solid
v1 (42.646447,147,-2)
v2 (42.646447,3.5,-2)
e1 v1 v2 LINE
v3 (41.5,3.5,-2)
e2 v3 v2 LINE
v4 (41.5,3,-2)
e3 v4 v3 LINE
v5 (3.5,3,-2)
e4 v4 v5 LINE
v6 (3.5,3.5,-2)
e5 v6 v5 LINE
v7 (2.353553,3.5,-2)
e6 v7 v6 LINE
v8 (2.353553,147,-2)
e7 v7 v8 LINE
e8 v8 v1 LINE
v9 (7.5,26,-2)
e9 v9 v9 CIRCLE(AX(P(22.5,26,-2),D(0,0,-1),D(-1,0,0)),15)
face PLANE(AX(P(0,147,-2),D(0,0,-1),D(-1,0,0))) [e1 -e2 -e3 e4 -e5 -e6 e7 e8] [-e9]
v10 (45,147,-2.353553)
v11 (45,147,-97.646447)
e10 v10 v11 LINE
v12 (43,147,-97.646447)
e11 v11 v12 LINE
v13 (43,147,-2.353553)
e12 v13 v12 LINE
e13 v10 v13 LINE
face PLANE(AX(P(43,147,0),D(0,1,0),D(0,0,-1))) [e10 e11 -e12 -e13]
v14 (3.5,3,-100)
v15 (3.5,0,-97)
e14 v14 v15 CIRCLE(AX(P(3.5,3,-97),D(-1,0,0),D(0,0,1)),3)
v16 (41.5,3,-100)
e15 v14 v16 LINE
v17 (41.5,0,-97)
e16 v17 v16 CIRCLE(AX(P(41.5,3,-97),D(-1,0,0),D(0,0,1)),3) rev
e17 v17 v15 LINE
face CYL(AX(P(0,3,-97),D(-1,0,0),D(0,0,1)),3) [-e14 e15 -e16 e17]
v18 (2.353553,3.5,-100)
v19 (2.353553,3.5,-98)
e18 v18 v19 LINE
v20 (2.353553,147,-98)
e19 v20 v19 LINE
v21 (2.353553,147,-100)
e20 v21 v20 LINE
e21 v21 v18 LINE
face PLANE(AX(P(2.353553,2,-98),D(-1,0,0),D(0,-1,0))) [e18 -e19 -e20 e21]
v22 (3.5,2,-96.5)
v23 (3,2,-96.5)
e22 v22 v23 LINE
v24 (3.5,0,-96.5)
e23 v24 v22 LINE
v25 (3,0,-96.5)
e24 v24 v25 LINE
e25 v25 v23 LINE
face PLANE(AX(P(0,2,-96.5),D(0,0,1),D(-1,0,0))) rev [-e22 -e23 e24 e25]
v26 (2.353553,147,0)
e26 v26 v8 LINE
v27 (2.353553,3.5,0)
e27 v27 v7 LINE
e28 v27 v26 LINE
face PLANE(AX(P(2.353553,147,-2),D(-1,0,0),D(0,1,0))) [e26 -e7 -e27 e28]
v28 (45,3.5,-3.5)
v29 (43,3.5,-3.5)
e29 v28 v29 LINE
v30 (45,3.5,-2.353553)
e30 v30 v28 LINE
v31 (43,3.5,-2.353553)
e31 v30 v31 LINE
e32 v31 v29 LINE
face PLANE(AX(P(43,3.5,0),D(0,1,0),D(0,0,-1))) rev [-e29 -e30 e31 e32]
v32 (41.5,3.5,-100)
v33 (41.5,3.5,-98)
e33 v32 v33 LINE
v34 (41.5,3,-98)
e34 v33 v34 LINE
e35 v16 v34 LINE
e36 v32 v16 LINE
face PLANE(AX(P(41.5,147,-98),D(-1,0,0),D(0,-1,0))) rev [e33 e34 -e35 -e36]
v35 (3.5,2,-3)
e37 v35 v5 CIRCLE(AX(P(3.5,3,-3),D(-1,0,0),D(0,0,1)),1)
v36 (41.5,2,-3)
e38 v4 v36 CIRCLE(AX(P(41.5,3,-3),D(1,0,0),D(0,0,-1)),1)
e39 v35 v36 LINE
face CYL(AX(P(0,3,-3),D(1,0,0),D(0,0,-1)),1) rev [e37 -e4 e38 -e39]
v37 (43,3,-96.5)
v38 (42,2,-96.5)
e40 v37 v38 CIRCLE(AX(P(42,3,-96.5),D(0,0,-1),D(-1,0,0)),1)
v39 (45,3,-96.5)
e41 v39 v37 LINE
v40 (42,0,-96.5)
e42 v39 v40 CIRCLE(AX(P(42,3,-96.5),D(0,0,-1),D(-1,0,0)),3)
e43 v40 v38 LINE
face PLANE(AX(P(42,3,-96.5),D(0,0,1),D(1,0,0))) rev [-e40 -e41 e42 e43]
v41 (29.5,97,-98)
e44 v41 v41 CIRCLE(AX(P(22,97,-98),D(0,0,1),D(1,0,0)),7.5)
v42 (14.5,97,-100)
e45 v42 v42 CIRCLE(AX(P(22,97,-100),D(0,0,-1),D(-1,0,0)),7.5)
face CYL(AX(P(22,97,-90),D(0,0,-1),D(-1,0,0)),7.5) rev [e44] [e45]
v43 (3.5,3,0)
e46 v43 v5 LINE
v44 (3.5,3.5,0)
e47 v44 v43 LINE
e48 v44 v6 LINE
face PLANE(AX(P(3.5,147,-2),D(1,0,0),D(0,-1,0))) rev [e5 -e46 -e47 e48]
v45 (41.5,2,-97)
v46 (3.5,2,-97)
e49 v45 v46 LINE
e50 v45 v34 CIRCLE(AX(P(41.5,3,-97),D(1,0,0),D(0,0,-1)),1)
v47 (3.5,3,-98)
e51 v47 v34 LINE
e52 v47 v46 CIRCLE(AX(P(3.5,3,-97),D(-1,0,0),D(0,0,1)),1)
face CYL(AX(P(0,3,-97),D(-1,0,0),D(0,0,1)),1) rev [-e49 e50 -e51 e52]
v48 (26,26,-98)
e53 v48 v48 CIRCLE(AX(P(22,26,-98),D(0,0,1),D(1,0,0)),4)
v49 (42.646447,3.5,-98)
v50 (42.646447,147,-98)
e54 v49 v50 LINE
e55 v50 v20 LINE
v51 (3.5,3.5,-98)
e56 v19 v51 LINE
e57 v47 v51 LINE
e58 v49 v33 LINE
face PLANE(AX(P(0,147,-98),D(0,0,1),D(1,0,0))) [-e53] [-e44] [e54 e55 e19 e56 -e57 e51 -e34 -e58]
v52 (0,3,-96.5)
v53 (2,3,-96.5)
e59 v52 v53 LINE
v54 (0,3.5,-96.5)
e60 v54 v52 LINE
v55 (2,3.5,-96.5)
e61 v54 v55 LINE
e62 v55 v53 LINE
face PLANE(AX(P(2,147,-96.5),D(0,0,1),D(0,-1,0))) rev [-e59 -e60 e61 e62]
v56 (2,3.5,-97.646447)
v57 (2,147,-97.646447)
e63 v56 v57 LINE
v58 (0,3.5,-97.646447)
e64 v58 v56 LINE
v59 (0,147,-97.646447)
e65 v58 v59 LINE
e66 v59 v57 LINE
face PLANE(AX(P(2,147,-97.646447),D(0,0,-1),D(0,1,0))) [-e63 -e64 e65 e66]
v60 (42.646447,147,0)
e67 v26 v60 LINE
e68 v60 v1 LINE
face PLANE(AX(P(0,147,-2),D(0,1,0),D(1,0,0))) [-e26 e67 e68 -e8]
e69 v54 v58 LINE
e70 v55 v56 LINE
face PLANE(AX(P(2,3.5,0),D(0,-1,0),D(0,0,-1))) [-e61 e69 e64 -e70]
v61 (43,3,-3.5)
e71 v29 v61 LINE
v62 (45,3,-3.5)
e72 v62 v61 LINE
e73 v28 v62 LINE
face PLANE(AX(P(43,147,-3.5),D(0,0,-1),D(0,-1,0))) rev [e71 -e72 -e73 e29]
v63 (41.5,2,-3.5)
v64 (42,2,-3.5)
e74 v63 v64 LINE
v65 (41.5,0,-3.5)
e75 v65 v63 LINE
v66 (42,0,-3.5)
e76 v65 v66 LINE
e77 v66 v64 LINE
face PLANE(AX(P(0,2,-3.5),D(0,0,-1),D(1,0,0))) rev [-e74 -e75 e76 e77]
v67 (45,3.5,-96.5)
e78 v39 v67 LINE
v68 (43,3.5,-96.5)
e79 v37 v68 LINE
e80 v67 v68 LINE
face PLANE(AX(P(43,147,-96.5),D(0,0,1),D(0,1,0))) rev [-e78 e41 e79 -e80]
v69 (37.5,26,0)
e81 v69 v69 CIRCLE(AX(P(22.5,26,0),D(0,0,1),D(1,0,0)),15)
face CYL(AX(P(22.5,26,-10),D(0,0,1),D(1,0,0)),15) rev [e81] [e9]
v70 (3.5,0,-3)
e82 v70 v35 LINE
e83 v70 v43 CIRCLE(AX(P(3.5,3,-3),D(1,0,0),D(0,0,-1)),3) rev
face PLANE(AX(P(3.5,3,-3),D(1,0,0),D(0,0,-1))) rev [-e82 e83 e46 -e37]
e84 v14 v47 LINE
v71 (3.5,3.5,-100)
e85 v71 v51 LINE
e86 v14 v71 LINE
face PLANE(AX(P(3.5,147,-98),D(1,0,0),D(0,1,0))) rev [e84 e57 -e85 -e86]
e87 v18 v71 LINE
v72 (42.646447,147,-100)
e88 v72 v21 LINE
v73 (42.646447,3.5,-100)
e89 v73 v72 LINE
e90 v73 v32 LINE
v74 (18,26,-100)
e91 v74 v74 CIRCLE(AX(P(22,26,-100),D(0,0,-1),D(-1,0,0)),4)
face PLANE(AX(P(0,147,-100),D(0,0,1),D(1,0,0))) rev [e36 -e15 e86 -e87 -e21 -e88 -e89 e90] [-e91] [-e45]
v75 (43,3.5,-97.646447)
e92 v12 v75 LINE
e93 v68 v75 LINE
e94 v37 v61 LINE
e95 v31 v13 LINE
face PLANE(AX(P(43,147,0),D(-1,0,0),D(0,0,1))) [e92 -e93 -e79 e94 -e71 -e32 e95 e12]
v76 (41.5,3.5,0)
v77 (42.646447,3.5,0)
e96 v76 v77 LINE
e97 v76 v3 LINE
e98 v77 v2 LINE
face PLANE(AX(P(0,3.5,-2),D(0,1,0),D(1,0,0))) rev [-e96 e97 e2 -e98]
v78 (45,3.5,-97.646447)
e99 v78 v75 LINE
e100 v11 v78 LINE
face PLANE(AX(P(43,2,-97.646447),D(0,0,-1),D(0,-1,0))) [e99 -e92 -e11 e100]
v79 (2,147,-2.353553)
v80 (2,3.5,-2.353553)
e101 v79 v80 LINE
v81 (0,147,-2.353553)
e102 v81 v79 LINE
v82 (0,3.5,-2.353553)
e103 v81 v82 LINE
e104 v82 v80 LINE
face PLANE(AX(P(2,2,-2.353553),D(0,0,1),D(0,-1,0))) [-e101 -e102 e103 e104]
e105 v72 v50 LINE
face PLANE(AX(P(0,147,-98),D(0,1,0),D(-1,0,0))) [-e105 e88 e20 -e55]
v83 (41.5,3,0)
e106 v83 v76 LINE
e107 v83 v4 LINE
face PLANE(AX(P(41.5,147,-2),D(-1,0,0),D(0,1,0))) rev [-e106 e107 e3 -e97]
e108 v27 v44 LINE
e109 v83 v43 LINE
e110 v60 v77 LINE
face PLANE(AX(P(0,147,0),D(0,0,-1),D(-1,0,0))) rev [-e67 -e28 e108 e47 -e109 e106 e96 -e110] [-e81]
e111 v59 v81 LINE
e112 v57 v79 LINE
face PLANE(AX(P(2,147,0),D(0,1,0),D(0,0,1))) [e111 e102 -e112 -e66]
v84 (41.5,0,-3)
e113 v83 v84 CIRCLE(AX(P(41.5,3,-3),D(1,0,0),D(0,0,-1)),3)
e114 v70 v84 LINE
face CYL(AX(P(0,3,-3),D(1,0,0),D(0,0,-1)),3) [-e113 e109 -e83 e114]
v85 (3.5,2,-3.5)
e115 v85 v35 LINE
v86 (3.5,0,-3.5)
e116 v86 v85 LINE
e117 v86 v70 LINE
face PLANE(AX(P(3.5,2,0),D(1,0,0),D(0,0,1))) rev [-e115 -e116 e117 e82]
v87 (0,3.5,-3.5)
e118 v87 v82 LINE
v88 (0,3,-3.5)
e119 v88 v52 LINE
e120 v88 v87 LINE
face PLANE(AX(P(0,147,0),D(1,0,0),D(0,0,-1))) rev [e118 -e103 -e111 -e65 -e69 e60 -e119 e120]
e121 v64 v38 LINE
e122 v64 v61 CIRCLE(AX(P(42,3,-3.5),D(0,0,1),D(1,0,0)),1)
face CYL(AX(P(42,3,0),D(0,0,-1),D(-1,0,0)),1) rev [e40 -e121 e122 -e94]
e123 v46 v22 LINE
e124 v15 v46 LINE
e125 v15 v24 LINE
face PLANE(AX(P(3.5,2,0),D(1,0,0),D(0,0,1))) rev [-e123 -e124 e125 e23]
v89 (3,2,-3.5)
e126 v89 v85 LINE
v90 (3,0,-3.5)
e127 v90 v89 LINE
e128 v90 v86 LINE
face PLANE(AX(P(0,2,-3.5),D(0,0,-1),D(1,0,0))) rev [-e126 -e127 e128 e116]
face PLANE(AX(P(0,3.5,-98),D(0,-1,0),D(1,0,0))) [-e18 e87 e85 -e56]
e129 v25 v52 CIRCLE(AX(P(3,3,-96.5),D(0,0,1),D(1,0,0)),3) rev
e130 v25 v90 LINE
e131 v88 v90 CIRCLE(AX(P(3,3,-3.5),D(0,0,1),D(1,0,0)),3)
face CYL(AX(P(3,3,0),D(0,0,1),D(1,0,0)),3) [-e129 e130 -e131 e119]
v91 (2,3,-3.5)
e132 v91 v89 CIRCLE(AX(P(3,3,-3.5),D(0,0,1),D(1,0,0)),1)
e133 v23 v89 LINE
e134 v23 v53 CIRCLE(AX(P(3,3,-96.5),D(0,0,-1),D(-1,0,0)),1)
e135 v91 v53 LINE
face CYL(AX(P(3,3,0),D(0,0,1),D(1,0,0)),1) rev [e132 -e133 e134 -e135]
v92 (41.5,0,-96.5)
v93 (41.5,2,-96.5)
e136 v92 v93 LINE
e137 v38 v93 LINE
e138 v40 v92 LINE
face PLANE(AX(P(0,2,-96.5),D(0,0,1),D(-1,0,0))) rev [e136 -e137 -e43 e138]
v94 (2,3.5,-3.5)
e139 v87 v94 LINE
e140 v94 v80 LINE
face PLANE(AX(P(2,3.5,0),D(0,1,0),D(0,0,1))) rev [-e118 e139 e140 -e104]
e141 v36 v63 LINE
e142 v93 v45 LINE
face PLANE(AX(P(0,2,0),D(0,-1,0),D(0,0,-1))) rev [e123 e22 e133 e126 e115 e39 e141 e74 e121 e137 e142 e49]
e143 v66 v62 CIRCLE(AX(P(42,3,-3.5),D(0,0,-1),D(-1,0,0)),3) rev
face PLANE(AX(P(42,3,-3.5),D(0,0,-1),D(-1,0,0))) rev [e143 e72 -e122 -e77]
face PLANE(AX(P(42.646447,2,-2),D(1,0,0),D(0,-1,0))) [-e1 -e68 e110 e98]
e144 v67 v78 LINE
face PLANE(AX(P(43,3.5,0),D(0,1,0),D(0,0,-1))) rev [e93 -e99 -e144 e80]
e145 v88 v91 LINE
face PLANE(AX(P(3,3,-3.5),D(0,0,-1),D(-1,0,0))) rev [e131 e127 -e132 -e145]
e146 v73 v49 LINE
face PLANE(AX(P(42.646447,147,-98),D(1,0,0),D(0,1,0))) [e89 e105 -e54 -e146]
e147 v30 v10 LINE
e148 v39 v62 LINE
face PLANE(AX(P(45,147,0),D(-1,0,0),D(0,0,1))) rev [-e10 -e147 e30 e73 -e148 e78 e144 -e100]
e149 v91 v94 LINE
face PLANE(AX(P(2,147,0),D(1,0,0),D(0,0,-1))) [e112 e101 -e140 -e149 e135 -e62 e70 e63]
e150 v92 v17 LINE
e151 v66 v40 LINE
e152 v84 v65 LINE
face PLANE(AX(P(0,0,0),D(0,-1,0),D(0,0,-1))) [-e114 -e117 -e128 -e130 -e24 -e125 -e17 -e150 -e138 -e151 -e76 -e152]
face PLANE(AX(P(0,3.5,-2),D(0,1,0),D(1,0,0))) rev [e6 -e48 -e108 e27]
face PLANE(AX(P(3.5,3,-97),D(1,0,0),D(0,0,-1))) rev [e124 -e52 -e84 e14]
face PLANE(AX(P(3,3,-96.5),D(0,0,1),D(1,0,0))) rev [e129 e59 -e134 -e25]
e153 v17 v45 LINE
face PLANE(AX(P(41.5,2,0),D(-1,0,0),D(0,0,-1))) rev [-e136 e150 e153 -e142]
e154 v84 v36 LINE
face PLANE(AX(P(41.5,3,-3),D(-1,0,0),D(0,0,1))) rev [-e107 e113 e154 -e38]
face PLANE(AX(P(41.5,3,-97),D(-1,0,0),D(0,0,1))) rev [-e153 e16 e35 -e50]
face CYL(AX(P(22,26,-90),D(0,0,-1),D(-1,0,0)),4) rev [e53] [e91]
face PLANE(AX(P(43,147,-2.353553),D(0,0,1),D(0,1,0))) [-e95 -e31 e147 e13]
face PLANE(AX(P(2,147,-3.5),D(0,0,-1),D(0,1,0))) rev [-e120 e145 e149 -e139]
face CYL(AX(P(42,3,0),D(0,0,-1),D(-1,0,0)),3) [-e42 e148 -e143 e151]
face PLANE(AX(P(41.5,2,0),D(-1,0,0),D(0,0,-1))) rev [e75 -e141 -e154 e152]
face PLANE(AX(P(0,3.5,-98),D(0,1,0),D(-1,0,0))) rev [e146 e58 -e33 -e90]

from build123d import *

# Parameters (mm, degrees)
SKETCH7_W              = 45
SKETCH7_H              = 100
BOSS_EXTRUDE1_DEPTH    = 147
SHELL1_T               = -2
CONVERT_SOLID1_START   = -1
CONVERT_SOLID1_DEPTH   = 3.353553391
CONVERT_SOLID1_START_2 = 42.646446609
CONVERT_SOLID1_2_DEPTH = 3.353553391
CONVERT_SOLID1_START_3 = 2.353553391
CONVERT_SOLID1_3_DEPTH = 40.292893218
CONVERT_SOLID1_4_DEPTH = 1.146446609
CONVERT_SOLID1_START_4 = 41.5
CONVERT_SOLID1_5_DEPTH = 1.146446609
CONVERT_SOLID1_START_5 = 3.5
CONVERT_SOLID1_6_DEPTH = 38
CONVERT_SOLID1_START_6 = -96.5
CONVERT_SOLID1_7_DEPTH = 93
CONVERT_SOLID1_8_DEPTH = 93
SKETCH13_R             = 15
CUT_EXTRUDE1_DEPTH     = 10
SKETCH14_R             = 4
CUT_EXTRUDE2_DEPTH     = 10
SKETCH15_R             = 7.5
CUT_EXTRUDE3_DEPTH     = 10


with BuildPart() as part:
    # Sketch7 → Boss-Extrude1 (new body)
    with BuildSketch(Plane(origin=(0, 0, 0), x_dir=(1, 0, 0), z_dir=(0, 1, 0))):
        with Locations((22.5, 50)):
            Rectangle(SKETCH7_W, SKETCH7_H)
    extrude(amount=BOSS_EXTRUDE1_DEPTH)

    # Shell1
    shell1_openings = [part.faces().sort_by_distance(p)[0] for p in [
        (22.5, 147, -50),
    ]]
    offset(amount=SHELL1_T, openings=shell1_openings, kind=Kind.INTERSECTION)

    # Convert-Solid1: read off the stored shape, not the designer's step
    # Convert-Solid1 outline → Convert-Solid1 (cut)
    with BuildSketch(Plane.YZ.offset(CONVERT_SOLID1_START)):
        Polygon((147, -100), (147, -97.646446609), (3.5, -97.646446609), (3.5, -96.5), (0, -96.5), (0, -100), align=None)
        Polygon((147, -2.353553391), (147, 0), (0, 0), (0, -3.5), (3.5, -3.5), (3.5, -2.353553391), align=None)
    extrude(amount=CONVERT_SOLID1_DEPTH, mode=Mode.SUBTRACT)

    # Convert-Solid1 2 outline → Convert-Solid1 2 (cut)
    with BuildSketch(Plane.YZ.offset(CONVERT_SOLID1_START_2)):
        Polygon((147, -100), (147, -97.646446609), (3.5, -97.646446609), (3.5, -96.5), (0, -96.5), (0, -100), align=None)
        Polygon((147, -2.353553391), (147, 0), (0, 0), (0, -3.5), (3.5, -3.5), (3.5, -2.353553391), align=None)
    extrude(amount=CONVERT_SOLID1_2_DEPTH, mode=Mode.SUBTRACT)

    # Convert-Solid1 3 outline → Convert-Solid1 3 (cut)
    with BuildSketch(Plane.YZ.offset(CONVERT_SOLID1_START_3)):
        with BuildLine():
            ThreePointArc((3, -100), (0.878679656, -99.121320344), (0, -97))
            Line((0, -97), (0, -100))
            Line((0, -100), (3, -100))
        make_face()
        with BuildLine():
            Line((0, 0), (0, -3))
            ThreePointArc((0, -3), (0.878679656, -0.878679656), (3, 0))
            Line((3, 0), (0, 0))
        make_face()
    extrude(amount=CONVERT_SOLID1_3_DEPTH, mode=Mode.SUBTRACT)

    # Convert-Solid1 4 outline → Convert-Solid1 4 (cut)
    with BuildSketch(Plane.YZ.offset(CONVERT_SOLID1_START_3)):
        with BuildLine():
            Line((2, -98), (2, -96.5))
            Line((2, -96.5), (0, -96.5))
            Line((0, -96.5), (0, -97))
            ThreePointArc((0, -97), (0.878679656, -99.121320344), (3, -100))
            Line((3, -100), (3.5, -100))
            Line((3.5, -100), (3.5, -98))
            Line((3.5, -98), (2, -98))
        make_face()
        with BuildLine():
            Line((0, -3.5), (2, -3.5))
            Line((2, -3.5), (2, -2))
            Line((2, -2), (3.5, -2))
            Line((3.5, -2), (3.5, 0))
            Line((3.5, 0), (3, 0))
            ThreePointArc((3, 0), (0.878679656, -0.878679656), (0, -3))
            Line((0, -3), (0, -3.5))
        make_face()
    extrude(amount=CONVERT_SOLID1_4_DEPTH, mode=Mode.SUBTRACT)

    # Convert-Solid1 5 outline → Convert-Solid1 5 (cut)
    with BuildSketch(Plane.YZ.offset(CONVERT_SOLID1_START_4)):
        with BuildLine():
            Line((2, -98), (2, -96.5))
            Line((2, -96.5), (0, -96.5))
            Line((0, -96.5), (0, -97))
            ThreePointArc((0, -97), (0.878679656, -99.121320344), (3, -100))
            Line((3, -100), (3.5, -100))
            Line((3.5, -100), (3.5, -98))
            Line((3.5, -98), (2, -98))
        make_face()
        with BuildLine():
            Line((0, -3.5), (2, -3.5))
            Line((2, -3.5), (2, -2))
            Line((2, -2), (3.5, -2))
            Line((3.5, -2), (3.5, 0))
            Line((3.5, 0), (3, 0))
            ThreePointArc((3, 0), (0.878679656, -0.878679656), (0, -3))
            Line((0, -3), (0, -3.5))
        make_face()
    extrude(amount=CONVERT_SOLID1_5_DEPTH, mode=Mode.SUBTRACT)

    # Convert-Solid1 6 outline → Convert-Solid1 6 (add)
    with BuildSketch(Plane.YZ.offset(CONVERT_SOLID1_START_5)):
        with BuildLine():
            ThreePointArc((3, -98), (2.292893219, -97.707106781), (2, -97))
            Line((2, -97), (2, -98))
            Line((2, -98), (3, -98))
        make_face()
        with BuildLine():
            Line((2, -2), (2, -3))
            ThreePointArc((2, -3), (2.292893219, -2.292893219), (3, -2))
            Line((3, -2), (2, -2))
        make_face()
    extrude(amount=CONVERT_SOLID1_6_DEPTH)

    # Convert-Solid1 7 outline → Convert-Solid1 7 (cut)
    with BuildSketch(Plane.XY.offset(CONVERT_SOLID1_START_6)):
        with BuildLine():
            Line((45, 0), (45, 3))
            ThreePointArc((45, 3), (44.121320344, 0.878679656), (42, 0))
            Line((42, 0), (45, 0))
        make_face()
        with BuildLine():
            Line((0, 0), (3, 0))
            ThreePointArc((3, 0), (0.878679656, 0.878679656), (0, 3))
            Line((0, 3), (0, 0))
        make_face()
    extrude(amount=CONVERT_SOLID1_7_DEPTH, mode=Mode.SUBTRACT)

    # Convert-Solid1 8 outline → Convert-Solid1 8 (add)
    with BuildSketch(Plane.XY.offset(CONVERT_SOLID1_START_6)):
        with BuildLine():
            Line((43, 2), (43, 3))
            ThreePointArc((43, 3), (42.707106781, 2.292893219), (42, 2))
            Line((42, 2), (43, 2))
        make_face()
        with BuildLine():
            Line((2, 2), (3, 2))
            ThreePointArc((3, 2), (2.292893219, 2.292893219), (2, 3))
            Line((2, 3), (2, 2))
        make_face()
    extrude(amount=CONVERT_SOLID1_8_DEPTH)

    # Sketch13 → Cut-Extrude1 (cut)
    with BuildSketch(Plane.XY):
        with Locations((22.5, 26)):
            Circle(SKETCH13_R)
    extrude(amount=-CUT_EXTRUDE1_DEPTH, mode=Mode.SUBTRACT)

    # Sketch14 → Cut-Extrude2 (cut)
    with BuildSketch(Plane(origin=(0, 0, -100), x_dir=(-1, 0, 0), z_dir=(0, 0, -1))):
        with Locations((-22, 26)):
            Circle(SKETCH14_R)
    extrude(amount=-CUT_EXTRUDE2_DEPTH, mode=Mode.SUBTRACT)

    # Sketch15 → Cut-Extrude3 (cut)
    with BuildSketch(Plane(origin=(0, 0, -100), x_dir=(-1, 0, 0), z_dir=(0, 0, -1))):
        with Locations((-22, 97)):
            Circle(SKETCH15_R)
    extrude(amount=-CUT_EXTRUDE3_DEPTH, mode=Mode.SUBTRACT)


solid = part.part
